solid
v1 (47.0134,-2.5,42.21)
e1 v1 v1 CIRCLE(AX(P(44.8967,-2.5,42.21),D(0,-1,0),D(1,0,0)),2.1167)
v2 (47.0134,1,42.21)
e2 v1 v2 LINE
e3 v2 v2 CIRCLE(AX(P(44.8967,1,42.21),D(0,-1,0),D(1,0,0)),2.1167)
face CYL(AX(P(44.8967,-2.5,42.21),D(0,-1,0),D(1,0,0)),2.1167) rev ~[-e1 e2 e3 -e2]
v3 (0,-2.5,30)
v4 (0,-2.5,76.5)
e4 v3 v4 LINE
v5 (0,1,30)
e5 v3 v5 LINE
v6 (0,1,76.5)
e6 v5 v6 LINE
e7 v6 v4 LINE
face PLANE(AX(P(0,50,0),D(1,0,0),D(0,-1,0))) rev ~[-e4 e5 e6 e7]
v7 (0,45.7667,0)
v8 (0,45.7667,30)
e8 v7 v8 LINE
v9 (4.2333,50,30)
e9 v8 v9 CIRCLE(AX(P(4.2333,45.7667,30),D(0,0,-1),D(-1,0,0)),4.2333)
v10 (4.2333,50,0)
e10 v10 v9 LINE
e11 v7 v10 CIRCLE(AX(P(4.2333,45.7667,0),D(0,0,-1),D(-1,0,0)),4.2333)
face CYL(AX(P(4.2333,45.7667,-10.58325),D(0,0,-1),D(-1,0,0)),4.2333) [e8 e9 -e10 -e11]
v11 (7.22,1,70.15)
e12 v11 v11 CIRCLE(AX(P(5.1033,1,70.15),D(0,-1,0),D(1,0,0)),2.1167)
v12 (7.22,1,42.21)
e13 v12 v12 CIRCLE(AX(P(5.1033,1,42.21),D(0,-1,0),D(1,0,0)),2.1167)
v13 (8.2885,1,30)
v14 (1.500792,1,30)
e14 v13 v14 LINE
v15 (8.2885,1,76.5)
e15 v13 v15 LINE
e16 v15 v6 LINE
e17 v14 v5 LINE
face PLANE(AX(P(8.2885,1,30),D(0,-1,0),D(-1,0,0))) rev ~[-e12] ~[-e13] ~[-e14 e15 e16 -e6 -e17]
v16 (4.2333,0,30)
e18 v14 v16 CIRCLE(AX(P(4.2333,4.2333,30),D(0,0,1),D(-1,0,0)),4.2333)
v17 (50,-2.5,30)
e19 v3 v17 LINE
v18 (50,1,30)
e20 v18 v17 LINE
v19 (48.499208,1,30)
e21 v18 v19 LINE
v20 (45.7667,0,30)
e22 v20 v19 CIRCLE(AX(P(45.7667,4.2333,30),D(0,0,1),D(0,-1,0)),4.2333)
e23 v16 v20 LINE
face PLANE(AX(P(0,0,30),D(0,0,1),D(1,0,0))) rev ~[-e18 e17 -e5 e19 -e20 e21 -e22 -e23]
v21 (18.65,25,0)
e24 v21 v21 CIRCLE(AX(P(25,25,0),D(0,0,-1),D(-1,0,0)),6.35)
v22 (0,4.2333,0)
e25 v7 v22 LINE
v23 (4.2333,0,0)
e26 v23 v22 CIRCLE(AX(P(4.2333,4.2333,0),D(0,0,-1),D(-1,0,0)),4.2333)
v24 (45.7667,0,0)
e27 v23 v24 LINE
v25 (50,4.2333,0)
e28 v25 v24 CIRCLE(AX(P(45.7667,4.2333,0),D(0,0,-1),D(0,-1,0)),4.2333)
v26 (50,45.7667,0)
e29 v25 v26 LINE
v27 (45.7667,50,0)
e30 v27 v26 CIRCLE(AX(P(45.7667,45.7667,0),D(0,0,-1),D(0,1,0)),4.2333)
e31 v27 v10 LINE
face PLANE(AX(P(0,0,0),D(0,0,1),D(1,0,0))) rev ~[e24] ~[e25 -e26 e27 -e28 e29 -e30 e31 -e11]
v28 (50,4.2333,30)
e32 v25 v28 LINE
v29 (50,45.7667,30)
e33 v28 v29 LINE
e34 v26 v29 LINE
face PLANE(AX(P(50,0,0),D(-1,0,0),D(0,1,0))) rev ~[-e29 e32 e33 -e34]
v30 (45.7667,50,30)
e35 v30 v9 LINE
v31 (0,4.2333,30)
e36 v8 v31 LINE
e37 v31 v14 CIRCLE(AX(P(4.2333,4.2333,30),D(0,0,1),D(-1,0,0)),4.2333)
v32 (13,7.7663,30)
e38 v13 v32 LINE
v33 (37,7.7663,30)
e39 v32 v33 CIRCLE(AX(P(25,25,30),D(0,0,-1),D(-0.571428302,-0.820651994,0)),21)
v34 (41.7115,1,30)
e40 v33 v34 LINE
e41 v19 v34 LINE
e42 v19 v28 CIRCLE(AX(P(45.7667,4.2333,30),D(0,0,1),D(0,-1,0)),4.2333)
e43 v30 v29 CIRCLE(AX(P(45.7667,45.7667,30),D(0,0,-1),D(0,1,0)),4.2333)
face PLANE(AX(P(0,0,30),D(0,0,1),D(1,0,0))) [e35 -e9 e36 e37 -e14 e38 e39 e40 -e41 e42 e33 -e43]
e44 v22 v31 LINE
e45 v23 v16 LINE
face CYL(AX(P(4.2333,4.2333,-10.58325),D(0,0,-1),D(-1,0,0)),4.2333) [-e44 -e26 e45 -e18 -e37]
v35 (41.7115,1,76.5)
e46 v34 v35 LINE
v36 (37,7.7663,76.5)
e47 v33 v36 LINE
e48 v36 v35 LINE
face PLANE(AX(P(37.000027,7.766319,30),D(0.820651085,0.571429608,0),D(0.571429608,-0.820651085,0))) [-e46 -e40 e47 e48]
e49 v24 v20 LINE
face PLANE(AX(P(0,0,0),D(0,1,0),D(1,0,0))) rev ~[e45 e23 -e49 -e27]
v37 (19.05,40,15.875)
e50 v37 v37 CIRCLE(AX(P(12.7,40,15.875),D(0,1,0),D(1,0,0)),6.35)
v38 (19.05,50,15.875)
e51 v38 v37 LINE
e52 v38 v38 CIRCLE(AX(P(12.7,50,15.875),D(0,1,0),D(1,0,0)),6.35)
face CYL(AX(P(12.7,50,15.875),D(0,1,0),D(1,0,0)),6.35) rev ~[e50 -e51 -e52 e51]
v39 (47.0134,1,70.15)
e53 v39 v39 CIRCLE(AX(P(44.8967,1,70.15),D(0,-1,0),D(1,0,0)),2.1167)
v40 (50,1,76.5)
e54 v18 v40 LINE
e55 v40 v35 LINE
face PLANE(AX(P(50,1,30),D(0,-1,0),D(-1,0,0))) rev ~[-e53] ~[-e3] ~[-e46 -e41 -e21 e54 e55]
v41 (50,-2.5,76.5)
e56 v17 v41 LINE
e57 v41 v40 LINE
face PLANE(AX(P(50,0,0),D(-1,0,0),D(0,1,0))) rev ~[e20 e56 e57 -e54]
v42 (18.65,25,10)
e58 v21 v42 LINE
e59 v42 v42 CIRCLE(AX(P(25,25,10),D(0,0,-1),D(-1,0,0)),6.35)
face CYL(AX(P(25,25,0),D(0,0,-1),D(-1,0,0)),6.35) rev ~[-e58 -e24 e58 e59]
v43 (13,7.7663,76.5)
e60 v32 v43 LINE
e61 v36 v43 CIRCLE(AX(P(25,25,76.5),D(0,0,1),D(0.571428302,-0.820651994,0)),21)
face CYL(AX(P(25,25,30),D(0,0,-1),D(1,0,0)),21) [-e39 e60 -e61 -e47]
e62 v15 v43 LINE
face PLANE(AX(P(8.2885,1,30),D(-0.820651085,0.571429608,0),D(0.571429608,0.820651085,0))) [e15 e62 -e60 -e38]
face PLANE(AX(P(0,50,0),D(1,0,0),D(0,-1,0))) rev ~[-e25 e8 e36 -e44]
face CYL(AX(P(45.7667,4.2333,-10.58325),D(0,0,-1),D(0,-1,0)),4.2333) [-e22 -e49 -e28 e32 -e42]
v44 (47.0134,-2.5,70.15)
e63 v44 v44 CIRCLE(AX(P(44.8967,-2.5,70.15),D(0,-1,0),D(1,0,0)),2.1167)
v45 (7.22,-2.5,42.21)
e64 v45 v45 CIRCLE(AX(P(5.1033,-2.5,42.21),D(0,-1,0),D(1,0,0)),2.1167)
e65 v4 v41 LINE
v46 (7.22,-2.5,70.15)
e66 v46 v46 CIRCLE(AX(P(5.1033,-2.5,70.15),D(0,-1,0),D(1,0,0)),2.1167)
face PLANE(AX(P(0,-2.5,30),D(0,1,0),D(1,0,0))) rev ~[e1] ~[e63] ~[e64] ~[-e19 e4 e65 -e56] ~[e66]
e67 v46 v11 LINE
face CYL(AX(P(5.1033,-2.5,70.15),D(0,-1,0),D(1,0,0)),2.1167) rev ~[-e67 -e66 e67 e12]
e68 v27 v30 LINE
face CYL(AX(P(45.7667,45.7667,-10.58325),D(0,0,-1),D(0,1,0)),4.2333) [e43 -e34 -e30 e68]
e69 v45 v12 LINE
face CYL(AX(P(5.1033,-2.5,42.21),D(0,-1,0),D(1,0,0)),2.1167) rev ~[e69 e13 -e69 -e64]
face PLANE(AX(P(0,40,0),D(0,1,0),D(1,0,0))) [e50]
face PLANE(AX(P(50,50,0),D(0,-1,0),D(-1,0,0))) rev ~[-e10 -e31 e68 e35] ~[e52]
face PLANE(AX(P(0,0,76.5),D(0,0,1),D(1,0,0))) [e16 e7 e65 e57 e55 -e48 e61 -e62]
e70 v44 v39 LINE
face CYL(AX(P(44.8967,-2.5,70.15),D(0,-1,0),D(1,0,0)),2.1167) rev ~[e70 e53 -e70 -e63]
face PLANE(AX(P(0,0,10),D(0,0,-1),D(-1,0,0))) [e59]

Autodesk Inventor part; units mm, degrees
ref_plane "YZ Plane" through (0, 0, 0) normal (1, 0, 0) x (0, 1, 0)
ref_plane "XZ Plane" through (0, 0, 0) normal (0, 1, 0) x (-1, 0, 0)
ref_plane "XY Plane" through (0, 0, 0) normal (0, 0, 1) x (1, 0, 0)
sketch "Sketch1" plane through (0, 0, 0) normal (0, 0, 1) x (1, 0, 0)
  line L0 (0, 0) -> (50, 0)
  line L1 (50, 0) -> (50, 50)
  line L2 (50, 50) -> (0, 50)
  line L3 (0, 50) -> (0, 0)
  line L4 (5.3353, 5.3353) -> (44.6647, 5.3353) construction
  line L5 (44.6647, 5.3353) -> (44.6647, 44.6647) construction
  line L6 (44.6647, 44.6647) -> (5.3353, 44.6647) construction
  line L7 (5.3353, 44.6647) -> (5.3353, 5.3353) construction
  line L8 (25, 44.6647) -> (25, 50) construction
  line L9 (44.6647, 25) -> (50, 25) construction
  dimension "d0" = 50
extrude "Extrusion1" add sketch "Sketch1" along normal blind 30
sketch "Sketch2" plane through (0, 0, 30) normal (0, 0, 1) x (1, 0, 0)
  line L0 (0, -2.5) -> (50, -2.5)
  line L1 (50, -2.5) -> (50, 1)
  line L2 (50, 1) -> (0, 1)
  line L3 (0, 1) -> (0, -2.5)
  circle A0 centre (25, 25) radius 21
  line L4 (50, 50) -> (0, 50) construction
  line L5 (50, 0) -> (50, 50) construction
  line L6 (25, 25) -> (25, 50) construction
  line L7 (25, 25) -> (50, 25) construction
  line L8 (13, 7.7663) -> (37, 7.7663)
  line L9 (8.2885, 1) -> (25, 25)
  line L10 (25, 25) -> (41.7115, 1)
  point P0 (0, 0)
  point P1 (0, -0.75)
  point P2 (50, -0.75)
  dimension "d3" = 2.5
  dimension "d4" = 3.5
  dimension "d5" = 42
  dimension "d6" = 24
extrude "Extrusion2" add sketch "Sketch2" along normal blind 46.5
sketch "Sketch3" plane through (0, -2.5, 30) normal (0, -1, 0) x (1, 0, 0)
  line L0 (44.8967, 40.15) -> (5.1033, 40.15) construction
  line L1 (5.1033, 40.15) -> (5.1033, 12.21) construction
  line L2 (5.1033, 12.21) -> (44.8967, 12.21) construction
  line L3 (44.8967, 12.21) -> (44.8967, 40.15) construction
  line L4 (0, 46.5) -> (50, 46.5) construction
  line L5 (25, 40.15) -> (25, 46.5) construction
  circle A0 centre (44.8967, 40.15) radius 2.1167
  circle A1 centre (44.8967, 12.21) radius 2.1167
  circle A2 centre (5.1033, 40.15) radius 2.1167
  circle A3 centre (5.1033, 12.21) radius 2.1167
  point P0 (0, -30)
  dimension "d9" = 27.94
  dimension "d10" = 6.35
  dimension "d11" = 39.7933
  dimension "d12" = 4.2333
extrude "Extrusion3" cut sketch "Sketch3" against normal up to surface (3.5 mm away)
sketch "Sketch4" plane through (0, 0, 0) normal (0, 0, -1) x (-1, 0, 0)
  circle A0 centre (-25, 25) radius 6.35
  line L0 (-50, 50) -> (0, 50) construction
  line L1 (0, 50) -> (0, 0) construction
  point P0 (-25, 50)
  point P1 (0, 25)
  dimension "d15" = 12.7
extrude "Extrusion4" cut sketch "Sketch4" against normal blind 10
sketch "Sketch5" plane through (0, 50, 0) normal (0, 1, 0) x (1, 0, 0)
  circle A0 centre (12.7, -15.875) radius 6.35
  point P0 (0, 0)
  dimension "d18" = 12.7
  dimension "d19" = 12.7
  dimension "d20" = 15.875
extrude "Extrusion5" cut sketch "Sketch5" against normal blind 10
fillet "Fillet1" radius 4.2333 4 edges at (50, 50, 15) (0, 50, 15) (0, 0, 15) (50, 0, 15)
properties part number "Water_pump"
